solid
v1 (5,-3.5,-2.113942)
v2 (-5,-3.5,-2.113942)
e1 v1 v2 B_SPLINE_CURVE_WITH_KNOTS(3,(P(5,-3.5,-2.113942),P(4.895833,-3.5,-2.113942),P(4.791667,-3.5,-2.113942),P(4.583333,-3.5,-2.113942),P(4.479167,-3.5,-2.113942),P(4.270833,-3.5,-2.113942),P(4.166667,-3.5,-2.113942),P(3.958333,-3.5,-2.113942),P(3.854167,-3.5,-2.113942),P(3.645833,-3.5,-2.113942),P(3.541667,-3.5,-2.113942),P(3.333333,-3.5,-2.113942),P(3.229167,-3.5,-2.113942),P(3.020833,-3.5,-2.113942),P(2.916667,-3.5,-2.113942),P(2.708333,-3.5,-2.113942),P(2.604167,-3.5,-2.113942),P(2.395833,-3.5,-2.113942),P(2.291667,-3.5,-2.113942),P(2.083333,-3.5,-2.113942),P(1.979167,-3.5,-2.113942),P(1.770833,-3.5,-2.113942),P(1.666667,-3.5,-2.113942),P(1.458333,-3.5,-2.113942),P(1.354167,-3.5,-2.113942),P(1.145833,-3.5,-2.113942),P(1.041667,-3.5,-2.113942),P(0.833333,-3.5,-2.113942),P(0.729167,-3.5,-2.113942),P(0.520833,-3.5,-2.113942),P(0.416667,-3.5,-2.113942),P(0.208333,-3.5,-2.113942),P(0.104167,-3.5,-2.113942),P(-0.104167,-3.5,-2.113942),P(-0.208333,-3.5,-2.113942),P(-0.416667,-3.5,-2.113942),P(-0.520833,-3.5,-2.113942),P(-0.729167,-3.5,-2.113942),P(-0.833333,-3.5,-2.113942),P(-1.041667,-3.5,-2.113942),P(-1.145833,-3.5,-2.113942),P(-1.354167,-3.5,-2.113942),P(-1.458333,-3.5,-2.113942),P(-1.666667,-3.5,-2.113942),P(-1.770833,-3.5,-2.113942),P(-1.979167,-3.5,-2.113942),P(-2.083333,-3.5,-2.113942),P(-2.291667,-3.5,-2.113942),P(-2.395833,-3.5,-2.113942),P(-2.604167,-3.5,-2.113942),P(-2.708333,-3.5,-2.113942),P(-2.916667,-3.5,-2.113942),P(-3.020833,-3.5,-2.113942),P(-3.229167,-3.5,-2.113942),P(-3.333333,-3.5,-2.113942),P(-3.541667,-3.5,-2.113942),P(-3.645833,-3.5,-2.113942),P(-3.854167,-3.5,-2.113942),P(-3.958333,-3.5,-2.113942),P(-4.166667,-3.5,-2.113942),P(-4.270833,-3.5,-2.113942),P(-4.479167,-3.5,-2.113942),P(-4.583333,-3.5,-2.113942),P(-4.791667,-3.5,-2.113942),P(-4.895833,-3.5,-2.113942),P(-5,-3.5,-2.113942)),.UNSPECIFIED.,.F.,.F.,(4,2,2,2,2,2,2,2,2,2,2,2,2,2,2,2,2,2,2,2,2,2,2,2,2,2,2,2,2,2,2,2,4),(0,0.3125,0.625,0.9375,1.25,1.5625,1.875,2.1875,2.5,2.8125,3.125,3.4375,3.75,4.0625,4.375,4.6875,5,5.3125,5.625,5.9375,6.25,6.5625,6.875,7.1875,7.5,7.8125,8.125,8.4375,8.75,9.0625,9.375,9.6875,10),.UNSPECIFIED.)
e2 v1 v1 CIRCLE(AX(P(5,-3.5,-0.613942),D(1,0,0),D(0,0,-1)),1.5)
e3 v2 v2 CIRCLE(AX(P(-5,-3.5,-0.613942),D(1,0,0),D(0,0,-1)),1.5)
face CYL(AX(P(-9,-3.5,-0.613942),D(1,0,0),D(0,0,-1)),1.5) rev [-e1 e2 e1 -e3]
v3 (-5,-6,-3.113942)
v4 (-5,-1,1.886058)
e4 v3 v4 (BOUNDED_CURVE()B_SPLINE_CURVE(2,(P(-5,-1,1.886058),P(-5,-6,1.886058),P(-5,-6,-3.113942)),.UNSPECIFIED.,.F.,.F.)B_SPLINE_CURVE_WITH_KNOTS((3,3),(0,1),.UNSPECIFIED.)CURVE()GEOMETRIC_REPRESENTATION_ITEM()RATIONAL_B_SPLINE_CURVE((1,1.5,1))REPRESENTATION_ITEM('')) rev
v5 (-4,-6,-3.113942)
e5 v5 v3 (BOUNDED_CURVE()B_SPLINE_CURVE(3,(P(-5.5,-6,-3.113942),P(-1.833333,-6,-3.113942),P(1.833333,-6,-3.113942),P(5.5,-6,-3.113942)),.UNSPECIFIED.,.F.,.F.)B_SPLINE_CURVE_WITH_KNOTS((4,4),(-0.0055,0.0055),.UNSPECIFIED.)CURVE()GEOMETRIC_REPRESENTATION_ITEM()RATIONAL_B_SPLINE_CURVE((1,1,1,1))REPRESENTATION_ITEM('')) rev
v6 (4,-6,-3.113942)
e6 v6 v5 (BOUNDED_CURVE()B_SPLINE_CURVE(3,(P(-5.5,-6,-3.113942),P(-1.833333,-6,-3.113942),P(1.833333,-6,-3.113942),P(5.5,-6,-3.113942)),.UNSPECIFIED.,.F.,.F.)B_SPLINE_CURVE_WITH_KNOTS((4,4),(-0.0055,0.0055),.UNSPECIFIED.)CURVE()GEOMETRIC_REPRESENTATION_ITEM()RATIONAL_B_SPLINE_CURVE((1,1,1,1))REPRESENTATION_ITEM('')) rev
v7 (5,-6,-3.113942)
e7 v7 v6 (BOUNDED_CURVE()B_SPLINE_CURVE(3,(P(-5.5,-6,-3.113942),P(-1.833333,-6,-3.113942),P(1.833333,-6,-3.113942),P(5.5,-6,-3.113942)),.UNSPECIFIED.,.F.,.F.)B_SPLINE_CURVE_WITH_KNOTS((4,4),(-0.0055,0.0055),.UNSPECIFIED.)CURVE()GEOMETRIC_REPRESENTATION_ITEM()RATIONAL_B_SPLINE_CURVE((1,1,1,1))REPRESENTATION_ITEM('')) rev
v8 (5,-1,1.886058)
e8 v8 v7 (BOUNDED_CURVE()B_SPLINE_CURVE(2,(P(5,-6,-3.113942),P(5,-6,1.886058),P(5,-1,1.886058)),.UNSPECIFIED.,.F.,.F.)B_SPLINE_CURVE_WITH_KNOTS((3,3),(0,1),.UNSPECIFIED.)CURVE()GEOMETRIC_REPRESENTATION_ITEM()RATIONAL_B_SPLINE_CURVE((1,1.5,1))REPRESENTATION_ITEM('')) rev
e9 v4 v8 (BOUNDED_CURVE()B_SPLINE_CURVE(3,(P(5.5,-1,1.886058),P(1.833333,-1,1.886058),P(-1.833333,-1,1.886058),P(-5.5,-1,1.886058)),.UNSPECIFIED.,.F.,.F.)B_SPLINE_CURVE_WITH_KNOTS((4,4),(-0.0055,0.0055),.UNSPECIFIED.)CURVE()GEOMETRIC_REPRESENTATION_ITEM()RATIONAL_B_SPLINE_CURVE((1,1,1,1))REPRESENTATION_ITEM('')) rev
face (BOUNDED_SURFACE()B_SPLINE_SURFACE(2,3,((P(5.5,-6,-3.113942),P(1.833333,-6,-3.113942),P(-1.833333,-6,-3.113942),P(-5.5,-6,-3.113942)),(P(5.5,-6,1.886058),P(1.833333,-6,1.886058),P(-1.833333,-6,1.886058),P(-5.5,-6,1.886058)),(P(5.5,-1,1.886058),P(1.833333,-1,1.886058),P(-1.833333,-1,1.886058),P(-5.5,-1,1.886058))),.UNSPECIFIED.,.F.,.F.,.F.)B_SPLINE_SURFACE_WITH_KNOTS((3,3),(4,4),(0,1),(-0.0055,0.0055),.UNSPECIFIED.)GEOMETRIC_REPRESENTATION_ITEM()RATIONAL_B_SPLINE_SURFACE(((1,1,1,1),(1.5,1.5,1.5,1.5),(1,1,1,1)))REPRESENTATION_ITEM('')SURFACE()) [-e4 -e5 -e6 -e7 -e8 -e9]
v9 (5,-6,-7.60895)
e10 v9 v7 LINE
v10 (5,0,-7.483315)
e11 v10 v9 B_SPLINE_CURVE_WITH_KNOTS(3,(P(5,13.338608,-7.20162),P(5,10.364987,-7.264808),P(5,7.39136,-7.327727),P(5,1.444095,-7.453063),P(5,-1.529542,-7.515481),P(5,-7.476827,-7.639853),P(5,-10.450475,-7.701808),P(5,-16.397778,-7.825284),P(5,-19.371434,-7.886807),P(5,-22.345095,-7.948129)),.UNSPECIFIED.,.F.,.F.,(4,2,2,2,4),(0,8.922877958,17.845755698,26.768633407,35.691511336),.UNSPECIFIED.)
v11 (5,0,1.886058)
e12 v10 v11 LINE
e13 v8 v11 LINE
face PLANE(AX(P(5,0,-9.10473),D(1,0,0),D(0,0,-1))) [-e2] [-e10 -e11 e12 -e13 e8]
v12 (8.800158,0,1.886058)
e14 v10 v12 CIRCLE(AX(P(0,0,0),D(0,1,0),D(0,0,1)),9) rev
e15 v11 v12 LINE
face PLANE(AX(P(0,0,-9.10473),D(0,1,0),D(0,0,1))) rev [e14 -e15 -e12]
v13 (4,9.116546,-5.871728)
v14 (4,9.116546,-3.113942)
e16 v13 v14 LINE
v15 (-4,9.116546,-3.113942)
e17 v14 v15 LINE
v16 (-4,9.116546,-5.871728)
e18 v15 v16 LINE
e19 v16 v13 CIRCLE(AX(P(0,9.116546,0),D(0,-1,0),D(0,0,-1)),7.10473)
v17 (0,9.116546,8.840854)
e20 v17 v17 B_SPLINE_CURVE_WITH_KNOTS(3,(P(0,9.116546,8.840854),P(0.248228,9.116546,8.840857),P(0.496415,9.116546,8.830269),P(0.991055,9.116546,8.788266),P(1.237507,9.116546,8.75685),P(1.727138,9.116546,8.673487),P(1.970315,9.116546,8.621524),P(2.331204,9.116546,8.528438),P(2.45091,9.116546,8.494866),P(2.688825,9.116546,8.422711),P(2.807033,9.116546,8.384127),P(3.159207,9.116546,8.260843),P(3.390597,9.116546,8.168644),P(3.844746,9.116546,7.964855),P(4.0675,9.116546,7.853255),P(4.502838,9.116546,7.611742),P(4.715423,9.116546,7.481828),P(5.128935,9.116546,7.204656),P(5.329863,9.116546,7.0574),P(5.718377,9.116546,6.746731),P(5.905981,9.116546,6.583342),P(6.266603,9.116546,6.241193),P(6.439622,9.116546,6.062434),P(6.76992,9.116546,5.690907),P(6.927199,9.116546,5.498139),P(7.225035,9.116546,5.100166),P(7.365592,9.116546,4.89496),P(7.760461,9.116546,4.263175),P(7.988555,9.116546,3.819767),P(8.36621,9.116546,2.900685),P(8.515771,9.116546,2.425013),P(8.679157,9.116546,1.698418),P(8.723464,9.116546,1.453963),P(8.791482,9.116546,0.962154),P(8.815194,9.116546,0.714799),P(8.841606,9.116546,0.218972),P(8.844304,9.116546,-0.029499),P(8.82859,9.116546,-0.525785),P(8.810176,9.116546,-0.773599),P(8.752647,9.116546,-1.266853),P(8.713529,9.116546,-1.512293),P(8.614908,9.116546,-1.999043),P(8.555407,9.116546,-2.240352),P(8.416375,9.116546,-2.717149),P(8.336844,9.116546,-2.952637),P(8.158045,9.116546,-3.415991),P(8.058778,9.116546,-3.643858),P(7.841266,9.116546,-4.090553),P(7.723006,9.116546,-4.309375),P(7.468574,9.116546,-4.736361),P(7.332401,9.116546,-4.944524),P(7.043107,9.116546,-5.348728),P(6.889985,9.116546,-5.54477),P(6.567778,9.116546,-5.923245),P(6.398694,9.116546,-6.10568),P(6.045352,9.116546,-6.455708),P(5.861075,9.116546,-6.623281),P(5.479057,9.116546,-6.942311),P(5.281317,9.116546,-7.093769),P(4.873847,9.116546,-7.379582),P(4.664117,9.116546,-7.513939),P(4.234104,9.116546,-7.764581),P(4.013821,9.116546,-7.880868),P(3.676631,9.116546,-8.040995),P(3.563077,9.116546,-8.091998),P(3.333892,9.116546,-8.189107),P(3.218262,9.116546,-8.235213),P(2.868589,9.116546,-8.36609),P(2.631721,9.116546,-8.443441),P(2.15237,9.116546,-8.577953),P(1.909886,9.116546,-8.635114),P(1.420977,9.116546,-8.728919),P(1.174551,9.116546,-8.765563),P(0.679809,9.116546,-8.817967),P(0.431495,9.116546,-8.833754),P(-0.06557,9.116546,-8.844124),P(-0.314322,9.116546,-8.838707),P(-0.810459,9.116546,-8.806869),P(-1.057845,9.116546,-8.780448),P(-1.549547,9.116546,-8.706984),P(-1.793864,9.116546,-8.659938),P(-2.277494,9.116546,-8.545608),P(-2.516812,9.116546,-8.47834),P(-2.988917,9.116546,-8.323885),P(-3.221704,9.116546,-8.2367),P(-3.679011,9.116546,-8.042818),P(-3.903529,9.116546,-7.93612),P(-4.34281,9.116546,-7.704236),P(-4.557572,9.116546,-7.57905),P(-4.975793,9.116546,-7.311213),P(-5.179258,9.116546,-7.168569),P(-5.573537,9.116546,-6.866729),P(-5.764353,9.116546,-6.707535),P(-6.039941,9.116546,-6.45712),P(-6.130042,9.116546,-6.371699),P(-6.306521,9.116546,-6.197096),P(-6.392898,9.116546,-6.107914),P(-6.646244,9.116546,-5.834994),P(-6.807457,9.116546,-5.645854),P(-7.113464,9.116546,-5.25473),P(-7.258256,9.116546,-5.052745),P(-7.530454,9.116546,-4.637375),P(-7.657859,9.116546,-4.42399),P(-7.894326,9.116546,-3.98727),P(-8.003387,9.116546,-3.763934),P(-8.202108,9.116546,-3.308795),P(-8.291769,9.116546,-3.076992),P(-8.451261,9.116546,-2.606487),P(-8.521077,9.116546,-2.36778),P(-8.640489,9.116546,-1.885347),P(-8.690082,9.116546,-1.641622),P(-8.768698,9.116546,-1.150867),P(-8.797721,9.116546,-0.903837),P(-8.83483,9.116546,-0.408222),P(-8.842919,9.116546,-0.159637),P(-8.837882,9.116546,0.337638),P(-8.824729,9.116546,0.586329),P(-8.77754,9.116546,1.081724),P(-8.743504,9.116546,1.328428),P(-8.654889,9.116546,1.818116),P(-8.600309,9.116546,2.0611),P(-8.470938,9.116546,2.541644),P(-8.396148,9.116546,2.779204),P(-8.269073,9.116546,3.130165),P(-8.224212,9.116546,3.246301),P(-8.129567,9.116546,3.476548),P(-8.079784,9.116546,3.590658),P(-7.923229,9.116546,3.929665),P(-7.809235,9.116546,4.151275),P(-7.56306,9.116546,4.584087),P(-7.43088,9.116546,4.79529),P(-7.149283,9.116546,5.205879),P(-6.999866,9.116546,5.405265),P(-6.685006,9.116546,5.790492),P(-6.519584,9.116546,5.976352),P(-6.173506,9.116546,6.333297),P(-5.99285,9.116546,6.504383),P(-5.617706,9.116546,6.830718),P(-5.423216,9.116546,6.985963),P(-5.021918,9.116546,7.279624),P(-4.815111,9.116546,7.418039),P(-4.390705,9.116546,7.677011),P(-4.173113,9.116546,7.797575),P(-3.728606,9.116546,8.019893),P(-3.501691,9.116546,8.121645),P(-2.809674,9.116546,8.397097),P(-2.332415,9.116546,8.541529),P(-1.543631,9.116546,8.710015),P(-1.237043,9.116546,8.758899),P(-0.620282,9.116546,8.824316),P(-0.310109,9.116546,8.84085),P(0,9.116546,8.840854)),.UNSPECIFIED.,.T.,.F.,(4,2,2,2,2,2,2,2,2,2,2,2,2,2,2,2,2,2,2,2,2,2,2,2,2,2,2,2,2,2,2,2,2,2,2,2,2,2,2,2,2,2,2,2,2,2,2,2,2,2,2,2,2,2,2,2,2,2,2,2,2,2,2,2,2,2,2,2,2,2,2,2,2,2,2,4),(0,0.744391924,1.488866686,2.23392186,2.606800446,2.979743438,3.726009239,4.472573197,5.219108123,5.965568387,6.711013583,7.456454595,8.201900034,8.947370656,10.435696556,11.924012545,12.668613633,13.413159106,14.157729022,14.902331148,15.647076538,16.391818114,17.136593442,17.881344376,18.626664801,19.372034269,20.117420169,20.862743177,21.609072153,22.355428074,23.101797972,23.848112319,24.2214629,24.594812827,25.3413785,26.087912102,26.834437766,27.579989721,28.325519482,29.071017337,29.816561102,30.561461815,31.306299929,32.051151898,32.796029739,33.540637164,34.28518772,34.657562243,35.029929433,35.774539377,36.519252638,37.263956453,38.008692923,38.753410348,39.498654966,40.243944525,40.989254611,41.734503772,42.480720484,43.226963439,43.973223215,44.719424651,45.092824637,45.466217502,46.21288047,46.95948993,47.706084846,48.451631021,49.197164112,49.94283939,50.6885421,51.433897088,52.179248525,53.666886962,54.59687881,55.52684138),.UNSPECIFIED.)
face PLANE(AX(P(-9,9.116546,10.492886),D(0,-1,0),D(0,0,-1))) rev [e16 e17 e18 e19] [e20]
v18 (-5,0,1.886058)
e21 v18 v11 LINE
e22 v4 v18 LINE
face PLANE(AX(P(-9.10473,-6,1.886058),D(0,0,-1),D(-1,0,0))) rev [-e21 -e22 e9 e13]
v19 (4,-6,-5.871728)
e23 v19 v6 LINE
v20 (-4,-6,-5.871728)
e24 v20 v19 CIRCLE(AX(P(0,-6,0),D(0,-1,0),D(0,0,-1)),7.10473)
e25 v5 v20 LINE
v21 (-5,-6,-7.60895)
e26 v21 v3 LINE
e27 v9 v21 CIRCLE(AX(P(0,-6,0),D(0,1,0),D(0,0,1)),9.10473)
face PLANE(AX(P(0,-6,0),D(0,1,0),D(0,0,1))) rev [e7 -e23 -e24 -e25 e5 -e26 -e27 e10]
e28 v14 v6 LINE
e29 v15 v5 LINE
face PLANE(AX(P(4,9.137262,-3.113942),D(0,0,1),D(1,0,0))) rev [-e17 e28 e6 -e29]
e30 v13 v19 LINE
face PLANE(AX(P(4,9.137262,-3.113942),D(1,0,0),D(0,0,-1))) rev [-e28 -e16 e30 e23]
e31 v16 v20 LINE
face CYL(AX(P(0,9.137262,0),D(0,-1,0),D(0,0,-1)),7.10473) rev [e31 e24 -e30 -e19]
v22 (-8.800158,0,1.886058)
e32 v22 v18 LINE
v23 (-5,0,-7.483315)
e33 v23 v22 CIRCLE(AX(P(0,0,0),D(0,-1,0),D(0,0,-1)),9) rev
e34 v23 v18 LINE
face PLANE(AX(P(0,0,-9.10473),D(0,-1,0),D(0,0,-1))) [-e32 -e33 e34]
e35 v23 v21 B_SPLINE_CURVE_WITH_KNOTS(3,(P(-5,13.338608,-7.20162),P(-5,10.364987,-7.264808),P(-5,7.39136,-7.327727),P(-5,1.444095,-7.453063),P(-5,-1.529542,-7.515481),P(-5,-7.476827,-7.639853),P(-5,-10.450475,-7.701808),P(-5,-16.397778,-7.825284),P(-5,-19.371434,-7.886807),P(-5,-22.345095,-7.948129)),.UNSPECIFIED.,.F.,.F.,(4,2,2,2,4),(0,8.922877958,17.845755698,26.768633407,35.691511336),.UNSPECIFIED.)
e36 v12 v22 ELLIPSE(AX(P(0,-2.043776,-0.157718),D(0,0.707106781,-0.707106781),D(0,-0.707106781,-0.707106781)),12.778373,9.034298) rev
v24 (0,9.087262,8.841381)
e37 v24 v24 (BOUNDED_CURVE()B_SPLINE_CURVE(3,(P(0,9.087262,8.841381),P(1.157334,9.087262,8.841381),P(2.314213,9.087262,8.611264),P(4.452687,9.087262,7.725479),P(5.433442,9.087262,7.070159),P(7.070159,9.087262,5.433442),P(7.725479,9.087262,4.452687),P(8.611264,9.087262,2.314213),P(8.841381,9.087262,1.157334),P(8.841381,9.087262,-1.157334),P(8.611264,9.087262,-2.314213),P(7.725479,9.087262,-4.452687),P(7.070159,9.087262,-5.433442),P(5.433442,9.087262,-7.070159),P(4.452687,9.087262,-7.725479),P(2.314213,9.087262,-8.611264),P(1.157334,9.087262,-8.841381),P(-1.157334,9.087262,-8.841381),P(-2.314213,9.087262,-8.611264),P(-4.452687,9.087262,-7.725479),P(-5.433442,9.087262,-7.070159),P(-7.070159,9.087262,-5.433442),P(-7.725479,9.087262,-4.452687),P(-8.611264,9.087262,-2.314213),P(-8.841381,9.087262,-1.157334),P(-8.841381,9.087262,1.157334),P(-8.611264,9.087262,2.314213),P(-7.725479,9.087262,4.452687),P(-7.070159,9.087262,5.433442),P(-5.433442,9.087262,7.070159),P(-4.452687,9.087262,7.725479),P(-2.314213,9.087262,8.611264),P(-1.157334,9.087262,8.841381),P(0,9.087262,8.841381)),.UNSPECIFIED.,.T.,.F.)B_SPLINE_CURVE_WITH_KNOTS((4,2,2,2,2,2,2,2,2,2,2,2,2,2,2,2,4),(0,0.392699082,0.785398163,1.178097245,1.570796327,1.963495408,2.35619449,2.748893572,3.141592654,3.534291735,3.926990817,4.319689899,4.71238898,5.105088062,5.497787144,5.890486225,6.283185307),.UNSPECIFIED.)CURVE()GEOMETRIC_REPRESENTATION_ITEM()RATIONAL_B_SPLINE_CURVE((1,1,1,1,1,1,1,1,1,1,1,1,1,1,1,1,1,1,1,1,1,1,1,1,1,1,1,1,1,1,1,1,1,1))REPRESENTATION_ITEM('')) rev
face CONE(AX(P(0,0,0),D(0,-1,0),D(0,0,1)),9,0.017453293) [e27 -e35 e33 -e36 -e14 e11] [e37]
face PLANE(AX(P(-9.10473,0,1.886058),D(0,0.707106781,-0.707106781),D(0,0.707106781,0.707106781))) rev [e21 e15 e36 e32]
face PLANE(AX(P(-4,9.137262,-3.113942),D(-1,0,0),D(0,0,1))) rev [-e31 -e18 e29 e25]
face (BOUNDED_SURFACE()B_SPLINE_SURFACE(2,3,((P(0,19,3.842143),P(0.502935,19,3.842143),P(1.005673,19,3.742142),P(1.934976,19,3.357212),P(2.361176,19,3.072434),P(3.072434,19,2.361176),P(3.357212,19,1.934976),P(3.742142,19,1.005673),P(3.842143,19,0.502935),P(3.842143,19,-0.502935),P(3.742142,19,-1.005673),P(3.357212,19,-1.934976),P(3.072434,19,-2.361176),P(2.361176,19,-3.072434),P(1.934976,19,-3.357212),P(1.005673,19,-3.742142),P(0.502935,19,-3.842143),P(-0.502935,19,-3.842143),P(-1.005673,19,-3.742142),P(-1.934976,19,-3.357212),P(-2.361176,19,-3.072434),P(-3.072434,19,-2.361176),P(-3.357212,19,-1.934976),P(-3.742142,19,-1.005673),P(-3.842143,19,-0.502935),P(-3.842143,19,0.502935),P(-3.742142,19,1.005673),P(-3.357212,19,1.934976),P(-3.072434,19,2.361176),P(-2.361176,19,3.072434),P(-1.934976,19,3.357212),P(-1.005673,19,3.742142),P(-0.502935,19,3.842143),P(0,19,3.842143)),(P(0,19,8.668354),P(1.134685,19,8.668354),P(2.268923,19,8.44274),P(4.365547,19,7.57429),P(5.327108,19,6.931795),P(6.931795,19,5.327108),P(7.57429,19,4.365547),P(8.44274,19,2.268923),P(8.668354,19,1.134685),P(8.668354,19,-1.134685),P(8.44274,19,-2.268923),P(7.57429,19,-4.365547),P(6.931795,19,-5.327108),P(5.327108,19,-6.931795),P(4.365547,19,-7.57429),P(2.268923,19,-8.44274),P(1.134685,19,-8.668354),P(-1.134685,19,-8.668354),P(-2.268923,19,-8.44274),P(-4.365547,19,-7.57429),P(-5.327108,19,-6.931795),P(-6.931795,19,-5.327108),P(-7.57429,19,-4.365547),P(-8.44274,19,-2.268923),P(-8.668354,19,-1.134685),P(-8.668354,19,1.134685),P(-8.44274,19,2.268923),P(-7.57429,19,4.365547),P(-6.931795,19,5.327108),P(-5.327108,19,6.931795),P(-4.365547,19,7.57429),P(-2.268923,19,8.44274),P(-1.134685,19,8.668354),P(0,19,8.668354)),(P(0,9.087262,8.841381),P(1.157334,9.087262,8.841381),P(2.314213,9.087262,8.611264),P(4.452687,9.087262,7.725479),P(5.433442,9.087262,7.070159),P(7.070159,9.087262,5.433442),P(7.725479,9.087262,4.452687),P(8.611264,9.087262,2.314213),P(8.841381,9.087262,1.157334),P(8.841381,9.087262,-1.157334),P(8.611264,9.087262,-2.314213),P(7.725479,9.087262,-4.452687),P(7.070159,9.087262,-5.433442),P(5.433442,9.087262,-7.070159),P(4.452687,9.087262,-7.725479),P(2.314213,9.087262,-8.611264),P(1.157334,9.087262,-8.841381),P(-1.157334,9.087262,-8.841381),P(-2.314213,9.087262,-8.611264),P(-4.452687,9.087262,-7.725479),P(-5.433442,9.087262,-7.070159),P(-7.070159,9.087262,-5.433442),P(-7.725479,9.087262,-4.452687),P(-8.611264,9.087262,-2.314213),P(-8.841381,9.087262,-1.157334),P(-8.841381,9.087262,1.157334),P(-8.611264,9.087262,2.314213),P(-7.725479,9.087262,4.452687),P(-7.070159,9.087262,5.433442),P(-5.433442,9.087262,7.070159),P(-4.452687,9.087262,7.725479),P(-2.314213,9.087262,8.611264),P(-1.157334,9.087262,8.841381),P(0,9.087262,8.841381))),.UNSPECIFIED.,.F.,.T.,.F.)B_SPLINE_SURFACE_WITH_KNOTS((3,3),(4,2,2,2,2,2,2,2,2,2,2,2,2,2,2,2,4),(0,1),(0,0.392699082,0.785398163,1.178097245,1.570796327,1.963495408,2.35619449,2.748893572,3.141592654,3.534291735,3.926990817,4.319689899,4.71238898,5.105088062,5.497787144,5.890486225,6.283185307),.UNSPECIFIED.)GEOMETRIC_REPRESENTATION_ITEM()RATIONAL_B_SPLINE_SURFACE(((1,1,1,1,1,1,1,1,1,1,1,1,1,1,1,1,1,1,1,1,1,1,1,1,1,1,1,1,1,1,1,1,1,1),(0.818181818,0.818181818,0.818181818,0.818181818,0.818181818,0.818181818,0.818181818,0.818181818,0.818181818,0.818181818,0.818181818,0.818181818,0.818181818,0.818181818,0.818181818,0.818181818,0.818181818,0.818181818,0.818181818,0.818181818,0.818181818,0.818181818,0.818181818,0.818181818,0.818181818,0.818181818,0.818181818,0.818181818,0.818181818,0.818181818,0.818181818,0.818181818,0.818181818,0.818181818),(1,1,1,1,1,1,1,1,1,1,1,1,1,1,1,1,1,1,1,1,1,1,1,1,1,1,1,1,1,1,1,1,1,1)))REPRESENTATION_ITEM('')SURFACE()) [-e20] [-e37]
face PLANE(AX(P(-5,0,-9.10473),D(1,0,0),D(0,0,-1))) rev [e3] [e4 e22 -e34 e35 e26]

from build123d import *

# Parameters (mm, degrees)
SKETCH1_R                     = 9
BOSS_EXTRUDE1_DEPTH           = 19
BOSS_EXTRUDE1_TAPER           = 1
BOSS_EXTRUDE1_OTHER_WAY_DEPTH = 6
BOSS_EXTRUDE1_OTHER_WAY_TAPER = -1
CUT_EXTRUDE1_DEPTH            = 23.951954839
CUT_EXTRUDE1_DEPTH_BACK       = 23.951954839
SKETCH4_W                     = 6.502745185
SKETCH4_H                     = 6
CUT_EXTRUDE2_DEPTH            = 24.763281499
SKETCH5_R                     = 1.5
CUT_EXTRUDE3_DEPTH            = 26.296168166
FILLET1_SIZE                  = 5
CUT_EXTRUDE4_DEPTH            = 23.910611578
CUT_EXTRUDE4_DEPTH_BACK       = 23.910611578
SKETCH6_W                     = 24.694280634
SKETCH6_H                     = 10.883453579
CUT_EXTRUDE5_DEPTH            = 20.809242737


with BuildPart() as part:
    # Sketch1 → Boss-Extrude1 (new body)
    with BuildSketch(Plane(origin=(0, 0, 0), x_dir=(1, 0, 0), z_dir=(0, 1, 0))):
        Circle(SKETCH1_R)
    extrude(amount=BOSS_EXTRUDE1_DEPTH, taper=BOSS_EXTRUDE1_TAPER)

    # Sketch1 → Boss-Extrude1 other way (add)
    with BuildSketch(Plane(origin=(0, 0, 0), x_dir=(1, 0, 0), z_dir=(0, 1, 0))):
        Circle(SKETCH1_R)
    extrude(amount=-BOSS_EXTRUDE1_OTHER_WAY_DEPTH, taper=BOSS_EXTRUDE1_OTHER_WAY_TAPER)

    # Sketch3 → Cut-Extrude1 (cut, two sides: drawn at the far end of the back side and taken through both)
    with BuildSketch(Plane(origin=(0, 0, 0), x_dir=(0, 0, -1), z_dir=(1, 0, 0)).offset(-CUT_EXTRUDE1_DEPTH_BACK)):
        Polygon((-1.886057768, -6), (-1.886057768, 0), (-9.929766736, 8.043708969), (-9.929766736, -6), align=None)
    extrude(amount=CUT_EXTRUDE1_DEPTH + CUT_EXTRUDE1_DEPTH_BACK, mode=Mode.SUBTRACT)

    # Sketch4 → Cut-Extrude2 (cut, through all)
    with BuildSketch(Plane.XY.offset(1.886057768)):
        with Locations((-8.251372593, -3)):
            Rectangle(SKETCH4_W, SKETCH4_H)
        with Locations((8.251372593, -3)):
            Rectangle(SKETCH4_W, SKETCH4_H)
    extrude(amount=-CUT_EXTRUDE2_DEPTH, mode=Mode.SUBTRACT)

    # Sketch5 → Cut-Extrude3 (cut, through all)
    with BuildSketch(Plane(origin=(5, 0, 0), x_dir=(0, 0, -1), z_dir=(1, 0, 0))):
        with Locations((0.613942232, -3.5)):
            Circle(SKETCH5_R)
    extrude(amount=-CUT_EXTRUDE3_DEPTH, mode=Mode.SUBTRACT)

    # Fillet1
    # a fillet whose section is not a circle: 5 mm, written as the material it takes off along each edge
    with BuildSketch(Plane(origin=(17.5, -6, 1.886057768), x_dir=(0, 0, -1), z_dir=(-1, 0, 0))) as fillet1_piece_1:
        with BuildLine():
            Bezier((FILLET1_SIZE, 0), (0, 0), (0, -FILLET1_SIZE), weights=[1, 1.5, 1])
            Line((0, -FILLET1_SIZE), (0, 0))
            Line((0, 0), (FILLET1_SIZE, 0))
        make_face()
    extrude(amount=35, mode=Mode.SUBTRACT)

    # Fillet2
    # a fillet whose section is not a circle: 10, 5 mm, written as the material it takes off along each edge
    with BuildSketch(Plane(origin=(0, 19, 0), x_dir=(1, 0, 0), z_dir=(0, 0, -1))) as fillet2_piece_1:
        with BuildLine():
            Bezier((8.841381251, 9.912737968), (8.668353766, 0), (3.842142775, 0), weights=[1, 0.818181818, 1])
            Line((3.842142775, 0), (8.668353766, 0))
            Line((8.668353766, 0), (8.841381251, 9.912737968))
        make_face()
    revolve(axis=Axis((0, 19, 0), (0, -1, 0)), mode=Mode.SUBTRACT)

    # Sketch6 → Cut-Extrude4 (cut, two sides: drawn at the far end of the back side and taken through both)
    with BuildSketch(Plane(origin=(0, 0, 0), x_dir=(0, 0, -1), z_dir=(1, 0, 0)).offset(-CUT_EXTRUDE4_DEPTH_BACK)):
        with Locations((1.854254765, 14.558273211)):
            Rectangle(SKETCH6_W, SKETCH6_H)
    extrude(amount=CUT_EXTRUDE4_DEPTH + CUT_EXTRUDE4_DEPTH_BACK, mode=Mode.SUBTRACT)

    # Sketch7 → Cut-Extrude5 (cut, through all)
    with BuildSketch(Plane.XZ.offset(6)):
        with BuildLine():
            Line((4, -3.113942232), (4, -5.871728358))
            ThreePointArc((4, -5.871728358), (0, -7.10473039), (-4, -5.871728358))
            Line((-4, -5.871728358), (-4, -3.113942232))
            Line((-4, -3.113942232), (4, -3.113942232))
        make_face()
    extrude(amount=-CUT_EXTRUDE5_DEPTH, mode=Mode.SUBTRACT)


solid = part.part
